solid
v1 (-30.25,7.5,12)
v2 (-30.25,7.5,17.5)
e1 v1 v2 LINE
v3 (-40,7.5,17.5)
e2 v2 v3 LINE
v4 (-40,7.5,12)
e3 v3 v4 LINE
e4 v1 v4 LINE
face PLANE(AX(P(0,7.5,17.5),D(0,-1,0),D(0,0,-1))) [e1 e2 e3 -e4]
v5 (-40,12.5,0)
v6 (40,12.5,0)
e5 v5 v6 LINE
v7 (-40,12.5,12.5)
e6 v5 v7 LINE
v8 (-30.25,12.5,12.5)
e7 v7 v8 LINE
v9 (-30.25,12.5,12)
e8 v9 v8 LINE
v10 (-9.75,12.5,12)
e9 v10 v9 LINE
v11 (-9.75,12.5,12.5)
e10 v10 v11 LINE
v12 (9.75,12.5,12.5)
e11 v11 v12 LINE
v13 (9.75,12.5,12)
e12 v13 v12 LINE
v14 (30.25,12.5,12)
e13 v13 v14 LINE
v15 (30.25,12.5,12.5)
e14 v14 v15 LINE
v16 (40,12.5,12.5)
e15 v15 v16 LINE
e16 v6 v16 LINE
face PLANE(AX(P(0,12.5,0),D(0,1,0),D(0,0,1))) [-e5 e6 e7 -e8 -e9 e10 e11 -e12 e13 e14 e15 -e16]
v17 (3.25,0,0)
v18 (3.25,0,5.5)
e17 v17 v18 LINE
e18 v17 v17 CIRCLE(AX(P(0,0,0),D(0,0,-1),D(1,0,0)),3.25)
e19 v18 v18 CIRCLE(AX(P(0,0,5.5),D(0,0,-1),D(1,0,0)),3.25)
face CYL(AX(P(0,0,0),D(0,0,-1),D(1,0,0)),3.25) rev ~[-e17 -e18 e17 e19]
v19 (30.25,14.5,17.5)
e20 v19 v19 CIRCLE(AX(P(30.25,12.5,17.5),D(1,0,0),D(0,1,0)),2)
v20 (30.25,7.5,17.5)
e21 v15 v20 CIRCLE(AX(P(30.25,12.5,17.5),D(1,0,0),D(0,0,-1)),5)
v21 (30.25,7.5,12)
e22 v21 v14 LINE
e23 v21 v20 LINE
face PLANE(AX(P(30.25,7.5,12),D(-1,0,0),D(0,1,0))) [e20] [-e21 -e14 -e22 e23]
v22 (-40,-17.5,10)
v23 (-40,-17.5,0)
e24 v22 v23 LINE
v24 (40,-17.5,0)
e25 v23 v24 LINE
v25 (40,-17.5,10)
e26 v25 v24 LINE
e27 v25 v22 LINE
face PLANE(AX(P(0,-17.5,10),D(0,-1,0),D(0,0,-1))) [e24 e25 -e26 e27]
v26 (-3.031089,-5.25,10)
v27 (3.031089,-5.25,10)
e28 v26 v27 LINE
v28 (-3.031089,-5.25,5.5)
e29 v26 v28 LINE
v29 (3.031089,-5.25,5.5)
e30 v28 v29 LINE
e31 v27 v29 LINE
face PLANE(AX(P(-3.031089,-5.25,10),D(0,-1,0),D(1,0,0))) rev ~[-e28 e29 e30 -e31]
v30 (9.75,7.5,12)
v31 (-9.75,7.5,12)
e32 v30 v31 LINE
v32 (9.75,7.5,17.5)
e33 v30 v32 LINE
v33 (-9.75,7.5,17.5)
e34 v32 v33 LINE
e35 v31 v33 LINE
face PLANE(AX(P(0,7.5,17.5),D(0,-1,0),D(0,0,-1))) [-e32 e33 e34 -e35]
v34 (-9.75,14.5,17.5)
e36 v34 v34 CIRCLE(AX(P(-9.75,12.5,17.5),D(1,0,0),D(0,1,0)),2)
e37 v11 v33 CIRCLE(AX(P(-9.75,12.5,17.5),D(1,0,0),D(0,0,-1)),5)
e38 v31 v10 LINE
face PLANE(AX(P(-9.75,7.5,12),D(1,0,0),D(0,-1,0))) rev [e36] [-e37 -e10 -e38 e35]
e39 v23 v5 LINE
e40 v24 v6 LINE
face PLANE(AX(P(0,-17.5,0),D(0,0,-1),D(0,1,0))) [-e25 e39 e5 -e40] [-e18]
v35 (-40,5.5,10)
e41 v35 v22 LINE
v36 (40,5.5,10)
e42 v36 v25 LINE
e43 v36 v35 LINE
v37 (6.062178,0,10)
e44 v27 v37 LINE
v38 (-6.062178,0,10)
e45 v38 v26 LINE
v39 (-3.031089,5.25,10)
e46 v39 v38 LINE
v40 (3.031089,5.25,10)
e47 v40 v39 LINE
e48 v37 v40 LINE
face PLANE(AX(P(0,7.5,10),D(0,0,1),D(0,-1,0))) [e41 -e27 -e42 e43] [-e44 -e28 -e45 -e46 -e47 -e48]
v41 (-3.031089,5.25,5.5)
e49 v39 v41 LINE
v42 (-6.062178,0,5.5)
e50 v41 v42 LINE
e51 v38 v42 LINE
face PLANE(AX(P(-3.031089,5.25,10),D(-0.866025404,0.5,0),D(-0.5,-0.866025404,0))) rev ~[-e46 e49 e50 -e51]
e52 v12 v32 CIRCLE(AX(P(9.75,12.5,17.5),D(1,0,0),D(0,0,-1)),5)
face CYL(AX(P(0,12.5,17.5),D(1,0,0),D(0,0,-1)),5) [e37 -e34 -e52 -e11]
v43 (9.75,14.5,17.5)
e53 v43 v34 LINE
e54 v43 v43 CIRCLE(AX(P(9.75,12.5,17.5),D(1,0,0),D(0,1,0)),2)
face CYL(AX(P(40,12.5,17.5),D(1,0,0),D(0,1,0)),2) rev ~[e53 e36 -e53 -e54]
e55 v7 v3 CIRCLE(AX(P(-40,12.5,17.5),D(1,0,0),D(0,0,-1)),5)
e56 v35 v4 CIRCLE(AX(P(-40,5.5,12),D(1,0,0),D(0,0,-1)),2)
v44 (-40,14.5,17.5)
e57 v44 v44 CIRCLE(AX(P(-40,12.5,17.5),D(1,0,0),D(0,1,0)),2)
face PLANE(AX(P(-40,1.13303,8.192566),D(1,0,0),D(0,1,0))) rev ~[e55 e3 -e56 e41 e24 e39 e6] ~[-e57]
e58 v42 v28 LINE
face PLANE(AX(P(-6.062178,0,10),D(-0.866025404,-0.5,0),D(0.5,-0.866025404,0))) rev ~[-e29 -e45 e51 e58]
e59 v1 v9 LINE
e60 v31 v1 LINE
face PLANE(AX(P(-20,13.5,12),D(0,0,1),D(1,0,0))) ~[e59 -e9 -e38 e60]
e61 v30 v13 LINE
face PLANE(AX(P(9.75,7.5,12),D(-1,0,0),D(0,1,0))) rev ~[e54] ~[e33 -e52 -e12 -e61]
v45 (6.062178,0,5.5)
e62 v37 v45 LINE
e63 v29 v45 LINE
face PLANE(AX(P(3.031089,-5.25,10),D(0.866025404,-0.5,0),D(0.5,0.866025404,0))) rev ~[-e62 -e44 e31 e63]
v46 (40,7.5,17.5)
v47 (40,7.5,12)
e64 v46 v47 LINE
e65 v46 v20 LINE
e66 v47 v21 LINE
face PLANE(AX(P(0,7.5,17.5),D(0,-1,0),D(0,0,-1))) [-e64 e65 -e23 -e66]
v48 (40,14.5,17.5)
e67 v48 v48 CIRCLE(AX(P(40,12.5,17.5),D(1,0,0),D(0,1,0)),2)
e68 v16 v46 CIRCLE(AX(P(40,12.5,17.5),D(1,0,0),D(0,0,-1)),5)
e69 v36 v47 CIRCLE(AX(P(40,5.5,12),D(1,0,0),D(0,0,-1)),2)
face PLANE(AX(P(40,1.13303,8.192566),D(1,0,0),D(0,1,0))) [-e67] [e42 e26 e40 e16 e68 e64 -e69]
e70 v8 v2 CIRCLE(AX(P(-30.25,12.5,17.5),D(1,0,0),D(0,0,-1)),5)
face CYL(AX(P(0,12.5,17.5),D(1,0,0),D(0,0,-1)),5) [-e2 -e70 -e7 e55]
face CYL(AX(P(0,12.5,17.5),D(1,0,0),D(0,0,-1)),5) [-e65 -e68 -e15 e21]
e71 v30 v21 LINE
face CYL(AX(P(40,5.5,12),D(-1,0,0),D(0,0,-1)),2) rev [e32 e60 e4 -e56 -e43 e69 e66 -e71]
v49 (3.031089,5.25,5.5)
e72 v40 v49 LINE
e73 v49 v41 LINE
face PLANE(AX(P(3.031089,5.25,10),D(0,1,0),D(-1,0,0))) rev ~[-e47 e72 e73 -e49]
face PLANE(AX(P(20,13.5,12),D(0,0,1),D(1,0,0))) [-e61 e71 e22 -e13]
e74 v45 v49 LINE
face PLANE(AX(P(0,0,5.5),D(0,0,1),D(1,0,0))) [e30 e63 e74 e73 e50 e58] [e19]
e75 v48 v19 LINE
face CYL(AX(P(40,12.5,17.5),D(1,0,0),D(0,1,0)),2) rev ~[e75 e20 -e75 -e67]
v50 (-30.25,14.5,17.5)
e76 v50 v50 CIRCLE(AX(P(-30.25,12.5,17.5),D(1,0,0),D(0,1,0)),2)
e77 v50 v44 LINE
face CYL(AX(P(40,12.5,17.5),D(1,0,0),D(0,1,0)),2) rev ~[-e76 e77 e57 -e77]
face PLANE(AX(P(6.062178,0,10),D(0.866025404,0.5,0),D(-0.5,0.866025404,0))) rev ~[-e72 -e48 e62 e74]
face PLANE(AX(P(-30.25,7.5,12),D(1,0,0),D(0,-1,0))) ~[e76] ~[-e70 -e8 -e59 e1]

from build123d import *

# Parameters (mm, degrees)
F1_DEPTH  = 40
F2_R      = 2
F3_DEPTH  = 80.001
F4_R      = 2
F6_W      = 20.5
F6_H      = 12
F7_DEPTH  = 10.501
F9_DEPTH  = 4.5
F10_R     = 3.25
F11_DEPTH = 22.501


# Not quite as in the source:
# - a pattern or mirror of a feature is missing from the dataset's text; its kind, count and spacing are read off the source's solid


with BuildPart() as f1:
    # F0 (on Right) → F1 (new body, symmetric)
    with BuildSketch(Plane.YZ):
        with BuildLine():
            Line((-17.5, 10), (-17.5, 0))
            Line((-17.5, 0), (12.5, 0))
            Line((12.5, 0), (12.5, 12.5))
            ThreePointArc((12.5, 12.5), (16.0355339059, 21.0355339059), (7.5, 17.5))
            Line((7.5, 17.5), (7.5, 10))
            Line((7.5, 10), (-17.5, 10))
        make_face()
    extrude(amount=F1_DEPTH, both=True)

    # F2 (on face) → F3 (cut, through all)
    with BuildSketch(Plane.YZ.offset(40)):
        with Locations((12.5, 17.5)):
            Circle(F2_R)
    extrude(amount=-F3_DEPTH, mode=Mode.SUBTRACT)

    # F4
    f4_edges = [f1.edges().sort_by_distance(p)[0] for p in [
        (0, 7.5, 10),
    ]]
    fillet(f4_edges, radius=F4_R)

    # F6 (on offset) → F7 (cut, through all)
    with BuildSketch(Plane.XY.offset(12)):
        with Locations((20, 13.5)):
            Rectangle(F6_W, F6_H)
    f7 = extrude(amount=F7_DEPTH, mode=Mode.SUBTRACT)

    # F7_copies: F7 across plane
    add(f7.mirror(Plane(origin=(0, 0, 0), x_dir=(0, 0, -1), z_dir=(-1, 0, 0))), mode=Mode.SUBTRACT)

    # F8 (on face) → F9 (cut)
    with BuildSketch(Plane.XY.offset(10)):
        Polygon((-3.0310889132, -5.25), (3.0310889132, -5.25), (6.0621778265, 0), (3.0310889132, 5.25), (-3.0310889132, 5.25), (-6.0621778265, 0), align=None)
    extrude(amount=-F9_DEPTH, mode=Mode.SUBTRACT)

    # F10 (on face) → F11 (cut, through all)
    with BuildSketch(Plane(origin=(0, 0, 0), x_dir=(1, 0, 0), z_dir=(0, 0, -1))):
        Circle(F10_R)
    extrude(amount=-F11_DEPTH, mode=Mode.SUBTRACT)


solid = f1.part
